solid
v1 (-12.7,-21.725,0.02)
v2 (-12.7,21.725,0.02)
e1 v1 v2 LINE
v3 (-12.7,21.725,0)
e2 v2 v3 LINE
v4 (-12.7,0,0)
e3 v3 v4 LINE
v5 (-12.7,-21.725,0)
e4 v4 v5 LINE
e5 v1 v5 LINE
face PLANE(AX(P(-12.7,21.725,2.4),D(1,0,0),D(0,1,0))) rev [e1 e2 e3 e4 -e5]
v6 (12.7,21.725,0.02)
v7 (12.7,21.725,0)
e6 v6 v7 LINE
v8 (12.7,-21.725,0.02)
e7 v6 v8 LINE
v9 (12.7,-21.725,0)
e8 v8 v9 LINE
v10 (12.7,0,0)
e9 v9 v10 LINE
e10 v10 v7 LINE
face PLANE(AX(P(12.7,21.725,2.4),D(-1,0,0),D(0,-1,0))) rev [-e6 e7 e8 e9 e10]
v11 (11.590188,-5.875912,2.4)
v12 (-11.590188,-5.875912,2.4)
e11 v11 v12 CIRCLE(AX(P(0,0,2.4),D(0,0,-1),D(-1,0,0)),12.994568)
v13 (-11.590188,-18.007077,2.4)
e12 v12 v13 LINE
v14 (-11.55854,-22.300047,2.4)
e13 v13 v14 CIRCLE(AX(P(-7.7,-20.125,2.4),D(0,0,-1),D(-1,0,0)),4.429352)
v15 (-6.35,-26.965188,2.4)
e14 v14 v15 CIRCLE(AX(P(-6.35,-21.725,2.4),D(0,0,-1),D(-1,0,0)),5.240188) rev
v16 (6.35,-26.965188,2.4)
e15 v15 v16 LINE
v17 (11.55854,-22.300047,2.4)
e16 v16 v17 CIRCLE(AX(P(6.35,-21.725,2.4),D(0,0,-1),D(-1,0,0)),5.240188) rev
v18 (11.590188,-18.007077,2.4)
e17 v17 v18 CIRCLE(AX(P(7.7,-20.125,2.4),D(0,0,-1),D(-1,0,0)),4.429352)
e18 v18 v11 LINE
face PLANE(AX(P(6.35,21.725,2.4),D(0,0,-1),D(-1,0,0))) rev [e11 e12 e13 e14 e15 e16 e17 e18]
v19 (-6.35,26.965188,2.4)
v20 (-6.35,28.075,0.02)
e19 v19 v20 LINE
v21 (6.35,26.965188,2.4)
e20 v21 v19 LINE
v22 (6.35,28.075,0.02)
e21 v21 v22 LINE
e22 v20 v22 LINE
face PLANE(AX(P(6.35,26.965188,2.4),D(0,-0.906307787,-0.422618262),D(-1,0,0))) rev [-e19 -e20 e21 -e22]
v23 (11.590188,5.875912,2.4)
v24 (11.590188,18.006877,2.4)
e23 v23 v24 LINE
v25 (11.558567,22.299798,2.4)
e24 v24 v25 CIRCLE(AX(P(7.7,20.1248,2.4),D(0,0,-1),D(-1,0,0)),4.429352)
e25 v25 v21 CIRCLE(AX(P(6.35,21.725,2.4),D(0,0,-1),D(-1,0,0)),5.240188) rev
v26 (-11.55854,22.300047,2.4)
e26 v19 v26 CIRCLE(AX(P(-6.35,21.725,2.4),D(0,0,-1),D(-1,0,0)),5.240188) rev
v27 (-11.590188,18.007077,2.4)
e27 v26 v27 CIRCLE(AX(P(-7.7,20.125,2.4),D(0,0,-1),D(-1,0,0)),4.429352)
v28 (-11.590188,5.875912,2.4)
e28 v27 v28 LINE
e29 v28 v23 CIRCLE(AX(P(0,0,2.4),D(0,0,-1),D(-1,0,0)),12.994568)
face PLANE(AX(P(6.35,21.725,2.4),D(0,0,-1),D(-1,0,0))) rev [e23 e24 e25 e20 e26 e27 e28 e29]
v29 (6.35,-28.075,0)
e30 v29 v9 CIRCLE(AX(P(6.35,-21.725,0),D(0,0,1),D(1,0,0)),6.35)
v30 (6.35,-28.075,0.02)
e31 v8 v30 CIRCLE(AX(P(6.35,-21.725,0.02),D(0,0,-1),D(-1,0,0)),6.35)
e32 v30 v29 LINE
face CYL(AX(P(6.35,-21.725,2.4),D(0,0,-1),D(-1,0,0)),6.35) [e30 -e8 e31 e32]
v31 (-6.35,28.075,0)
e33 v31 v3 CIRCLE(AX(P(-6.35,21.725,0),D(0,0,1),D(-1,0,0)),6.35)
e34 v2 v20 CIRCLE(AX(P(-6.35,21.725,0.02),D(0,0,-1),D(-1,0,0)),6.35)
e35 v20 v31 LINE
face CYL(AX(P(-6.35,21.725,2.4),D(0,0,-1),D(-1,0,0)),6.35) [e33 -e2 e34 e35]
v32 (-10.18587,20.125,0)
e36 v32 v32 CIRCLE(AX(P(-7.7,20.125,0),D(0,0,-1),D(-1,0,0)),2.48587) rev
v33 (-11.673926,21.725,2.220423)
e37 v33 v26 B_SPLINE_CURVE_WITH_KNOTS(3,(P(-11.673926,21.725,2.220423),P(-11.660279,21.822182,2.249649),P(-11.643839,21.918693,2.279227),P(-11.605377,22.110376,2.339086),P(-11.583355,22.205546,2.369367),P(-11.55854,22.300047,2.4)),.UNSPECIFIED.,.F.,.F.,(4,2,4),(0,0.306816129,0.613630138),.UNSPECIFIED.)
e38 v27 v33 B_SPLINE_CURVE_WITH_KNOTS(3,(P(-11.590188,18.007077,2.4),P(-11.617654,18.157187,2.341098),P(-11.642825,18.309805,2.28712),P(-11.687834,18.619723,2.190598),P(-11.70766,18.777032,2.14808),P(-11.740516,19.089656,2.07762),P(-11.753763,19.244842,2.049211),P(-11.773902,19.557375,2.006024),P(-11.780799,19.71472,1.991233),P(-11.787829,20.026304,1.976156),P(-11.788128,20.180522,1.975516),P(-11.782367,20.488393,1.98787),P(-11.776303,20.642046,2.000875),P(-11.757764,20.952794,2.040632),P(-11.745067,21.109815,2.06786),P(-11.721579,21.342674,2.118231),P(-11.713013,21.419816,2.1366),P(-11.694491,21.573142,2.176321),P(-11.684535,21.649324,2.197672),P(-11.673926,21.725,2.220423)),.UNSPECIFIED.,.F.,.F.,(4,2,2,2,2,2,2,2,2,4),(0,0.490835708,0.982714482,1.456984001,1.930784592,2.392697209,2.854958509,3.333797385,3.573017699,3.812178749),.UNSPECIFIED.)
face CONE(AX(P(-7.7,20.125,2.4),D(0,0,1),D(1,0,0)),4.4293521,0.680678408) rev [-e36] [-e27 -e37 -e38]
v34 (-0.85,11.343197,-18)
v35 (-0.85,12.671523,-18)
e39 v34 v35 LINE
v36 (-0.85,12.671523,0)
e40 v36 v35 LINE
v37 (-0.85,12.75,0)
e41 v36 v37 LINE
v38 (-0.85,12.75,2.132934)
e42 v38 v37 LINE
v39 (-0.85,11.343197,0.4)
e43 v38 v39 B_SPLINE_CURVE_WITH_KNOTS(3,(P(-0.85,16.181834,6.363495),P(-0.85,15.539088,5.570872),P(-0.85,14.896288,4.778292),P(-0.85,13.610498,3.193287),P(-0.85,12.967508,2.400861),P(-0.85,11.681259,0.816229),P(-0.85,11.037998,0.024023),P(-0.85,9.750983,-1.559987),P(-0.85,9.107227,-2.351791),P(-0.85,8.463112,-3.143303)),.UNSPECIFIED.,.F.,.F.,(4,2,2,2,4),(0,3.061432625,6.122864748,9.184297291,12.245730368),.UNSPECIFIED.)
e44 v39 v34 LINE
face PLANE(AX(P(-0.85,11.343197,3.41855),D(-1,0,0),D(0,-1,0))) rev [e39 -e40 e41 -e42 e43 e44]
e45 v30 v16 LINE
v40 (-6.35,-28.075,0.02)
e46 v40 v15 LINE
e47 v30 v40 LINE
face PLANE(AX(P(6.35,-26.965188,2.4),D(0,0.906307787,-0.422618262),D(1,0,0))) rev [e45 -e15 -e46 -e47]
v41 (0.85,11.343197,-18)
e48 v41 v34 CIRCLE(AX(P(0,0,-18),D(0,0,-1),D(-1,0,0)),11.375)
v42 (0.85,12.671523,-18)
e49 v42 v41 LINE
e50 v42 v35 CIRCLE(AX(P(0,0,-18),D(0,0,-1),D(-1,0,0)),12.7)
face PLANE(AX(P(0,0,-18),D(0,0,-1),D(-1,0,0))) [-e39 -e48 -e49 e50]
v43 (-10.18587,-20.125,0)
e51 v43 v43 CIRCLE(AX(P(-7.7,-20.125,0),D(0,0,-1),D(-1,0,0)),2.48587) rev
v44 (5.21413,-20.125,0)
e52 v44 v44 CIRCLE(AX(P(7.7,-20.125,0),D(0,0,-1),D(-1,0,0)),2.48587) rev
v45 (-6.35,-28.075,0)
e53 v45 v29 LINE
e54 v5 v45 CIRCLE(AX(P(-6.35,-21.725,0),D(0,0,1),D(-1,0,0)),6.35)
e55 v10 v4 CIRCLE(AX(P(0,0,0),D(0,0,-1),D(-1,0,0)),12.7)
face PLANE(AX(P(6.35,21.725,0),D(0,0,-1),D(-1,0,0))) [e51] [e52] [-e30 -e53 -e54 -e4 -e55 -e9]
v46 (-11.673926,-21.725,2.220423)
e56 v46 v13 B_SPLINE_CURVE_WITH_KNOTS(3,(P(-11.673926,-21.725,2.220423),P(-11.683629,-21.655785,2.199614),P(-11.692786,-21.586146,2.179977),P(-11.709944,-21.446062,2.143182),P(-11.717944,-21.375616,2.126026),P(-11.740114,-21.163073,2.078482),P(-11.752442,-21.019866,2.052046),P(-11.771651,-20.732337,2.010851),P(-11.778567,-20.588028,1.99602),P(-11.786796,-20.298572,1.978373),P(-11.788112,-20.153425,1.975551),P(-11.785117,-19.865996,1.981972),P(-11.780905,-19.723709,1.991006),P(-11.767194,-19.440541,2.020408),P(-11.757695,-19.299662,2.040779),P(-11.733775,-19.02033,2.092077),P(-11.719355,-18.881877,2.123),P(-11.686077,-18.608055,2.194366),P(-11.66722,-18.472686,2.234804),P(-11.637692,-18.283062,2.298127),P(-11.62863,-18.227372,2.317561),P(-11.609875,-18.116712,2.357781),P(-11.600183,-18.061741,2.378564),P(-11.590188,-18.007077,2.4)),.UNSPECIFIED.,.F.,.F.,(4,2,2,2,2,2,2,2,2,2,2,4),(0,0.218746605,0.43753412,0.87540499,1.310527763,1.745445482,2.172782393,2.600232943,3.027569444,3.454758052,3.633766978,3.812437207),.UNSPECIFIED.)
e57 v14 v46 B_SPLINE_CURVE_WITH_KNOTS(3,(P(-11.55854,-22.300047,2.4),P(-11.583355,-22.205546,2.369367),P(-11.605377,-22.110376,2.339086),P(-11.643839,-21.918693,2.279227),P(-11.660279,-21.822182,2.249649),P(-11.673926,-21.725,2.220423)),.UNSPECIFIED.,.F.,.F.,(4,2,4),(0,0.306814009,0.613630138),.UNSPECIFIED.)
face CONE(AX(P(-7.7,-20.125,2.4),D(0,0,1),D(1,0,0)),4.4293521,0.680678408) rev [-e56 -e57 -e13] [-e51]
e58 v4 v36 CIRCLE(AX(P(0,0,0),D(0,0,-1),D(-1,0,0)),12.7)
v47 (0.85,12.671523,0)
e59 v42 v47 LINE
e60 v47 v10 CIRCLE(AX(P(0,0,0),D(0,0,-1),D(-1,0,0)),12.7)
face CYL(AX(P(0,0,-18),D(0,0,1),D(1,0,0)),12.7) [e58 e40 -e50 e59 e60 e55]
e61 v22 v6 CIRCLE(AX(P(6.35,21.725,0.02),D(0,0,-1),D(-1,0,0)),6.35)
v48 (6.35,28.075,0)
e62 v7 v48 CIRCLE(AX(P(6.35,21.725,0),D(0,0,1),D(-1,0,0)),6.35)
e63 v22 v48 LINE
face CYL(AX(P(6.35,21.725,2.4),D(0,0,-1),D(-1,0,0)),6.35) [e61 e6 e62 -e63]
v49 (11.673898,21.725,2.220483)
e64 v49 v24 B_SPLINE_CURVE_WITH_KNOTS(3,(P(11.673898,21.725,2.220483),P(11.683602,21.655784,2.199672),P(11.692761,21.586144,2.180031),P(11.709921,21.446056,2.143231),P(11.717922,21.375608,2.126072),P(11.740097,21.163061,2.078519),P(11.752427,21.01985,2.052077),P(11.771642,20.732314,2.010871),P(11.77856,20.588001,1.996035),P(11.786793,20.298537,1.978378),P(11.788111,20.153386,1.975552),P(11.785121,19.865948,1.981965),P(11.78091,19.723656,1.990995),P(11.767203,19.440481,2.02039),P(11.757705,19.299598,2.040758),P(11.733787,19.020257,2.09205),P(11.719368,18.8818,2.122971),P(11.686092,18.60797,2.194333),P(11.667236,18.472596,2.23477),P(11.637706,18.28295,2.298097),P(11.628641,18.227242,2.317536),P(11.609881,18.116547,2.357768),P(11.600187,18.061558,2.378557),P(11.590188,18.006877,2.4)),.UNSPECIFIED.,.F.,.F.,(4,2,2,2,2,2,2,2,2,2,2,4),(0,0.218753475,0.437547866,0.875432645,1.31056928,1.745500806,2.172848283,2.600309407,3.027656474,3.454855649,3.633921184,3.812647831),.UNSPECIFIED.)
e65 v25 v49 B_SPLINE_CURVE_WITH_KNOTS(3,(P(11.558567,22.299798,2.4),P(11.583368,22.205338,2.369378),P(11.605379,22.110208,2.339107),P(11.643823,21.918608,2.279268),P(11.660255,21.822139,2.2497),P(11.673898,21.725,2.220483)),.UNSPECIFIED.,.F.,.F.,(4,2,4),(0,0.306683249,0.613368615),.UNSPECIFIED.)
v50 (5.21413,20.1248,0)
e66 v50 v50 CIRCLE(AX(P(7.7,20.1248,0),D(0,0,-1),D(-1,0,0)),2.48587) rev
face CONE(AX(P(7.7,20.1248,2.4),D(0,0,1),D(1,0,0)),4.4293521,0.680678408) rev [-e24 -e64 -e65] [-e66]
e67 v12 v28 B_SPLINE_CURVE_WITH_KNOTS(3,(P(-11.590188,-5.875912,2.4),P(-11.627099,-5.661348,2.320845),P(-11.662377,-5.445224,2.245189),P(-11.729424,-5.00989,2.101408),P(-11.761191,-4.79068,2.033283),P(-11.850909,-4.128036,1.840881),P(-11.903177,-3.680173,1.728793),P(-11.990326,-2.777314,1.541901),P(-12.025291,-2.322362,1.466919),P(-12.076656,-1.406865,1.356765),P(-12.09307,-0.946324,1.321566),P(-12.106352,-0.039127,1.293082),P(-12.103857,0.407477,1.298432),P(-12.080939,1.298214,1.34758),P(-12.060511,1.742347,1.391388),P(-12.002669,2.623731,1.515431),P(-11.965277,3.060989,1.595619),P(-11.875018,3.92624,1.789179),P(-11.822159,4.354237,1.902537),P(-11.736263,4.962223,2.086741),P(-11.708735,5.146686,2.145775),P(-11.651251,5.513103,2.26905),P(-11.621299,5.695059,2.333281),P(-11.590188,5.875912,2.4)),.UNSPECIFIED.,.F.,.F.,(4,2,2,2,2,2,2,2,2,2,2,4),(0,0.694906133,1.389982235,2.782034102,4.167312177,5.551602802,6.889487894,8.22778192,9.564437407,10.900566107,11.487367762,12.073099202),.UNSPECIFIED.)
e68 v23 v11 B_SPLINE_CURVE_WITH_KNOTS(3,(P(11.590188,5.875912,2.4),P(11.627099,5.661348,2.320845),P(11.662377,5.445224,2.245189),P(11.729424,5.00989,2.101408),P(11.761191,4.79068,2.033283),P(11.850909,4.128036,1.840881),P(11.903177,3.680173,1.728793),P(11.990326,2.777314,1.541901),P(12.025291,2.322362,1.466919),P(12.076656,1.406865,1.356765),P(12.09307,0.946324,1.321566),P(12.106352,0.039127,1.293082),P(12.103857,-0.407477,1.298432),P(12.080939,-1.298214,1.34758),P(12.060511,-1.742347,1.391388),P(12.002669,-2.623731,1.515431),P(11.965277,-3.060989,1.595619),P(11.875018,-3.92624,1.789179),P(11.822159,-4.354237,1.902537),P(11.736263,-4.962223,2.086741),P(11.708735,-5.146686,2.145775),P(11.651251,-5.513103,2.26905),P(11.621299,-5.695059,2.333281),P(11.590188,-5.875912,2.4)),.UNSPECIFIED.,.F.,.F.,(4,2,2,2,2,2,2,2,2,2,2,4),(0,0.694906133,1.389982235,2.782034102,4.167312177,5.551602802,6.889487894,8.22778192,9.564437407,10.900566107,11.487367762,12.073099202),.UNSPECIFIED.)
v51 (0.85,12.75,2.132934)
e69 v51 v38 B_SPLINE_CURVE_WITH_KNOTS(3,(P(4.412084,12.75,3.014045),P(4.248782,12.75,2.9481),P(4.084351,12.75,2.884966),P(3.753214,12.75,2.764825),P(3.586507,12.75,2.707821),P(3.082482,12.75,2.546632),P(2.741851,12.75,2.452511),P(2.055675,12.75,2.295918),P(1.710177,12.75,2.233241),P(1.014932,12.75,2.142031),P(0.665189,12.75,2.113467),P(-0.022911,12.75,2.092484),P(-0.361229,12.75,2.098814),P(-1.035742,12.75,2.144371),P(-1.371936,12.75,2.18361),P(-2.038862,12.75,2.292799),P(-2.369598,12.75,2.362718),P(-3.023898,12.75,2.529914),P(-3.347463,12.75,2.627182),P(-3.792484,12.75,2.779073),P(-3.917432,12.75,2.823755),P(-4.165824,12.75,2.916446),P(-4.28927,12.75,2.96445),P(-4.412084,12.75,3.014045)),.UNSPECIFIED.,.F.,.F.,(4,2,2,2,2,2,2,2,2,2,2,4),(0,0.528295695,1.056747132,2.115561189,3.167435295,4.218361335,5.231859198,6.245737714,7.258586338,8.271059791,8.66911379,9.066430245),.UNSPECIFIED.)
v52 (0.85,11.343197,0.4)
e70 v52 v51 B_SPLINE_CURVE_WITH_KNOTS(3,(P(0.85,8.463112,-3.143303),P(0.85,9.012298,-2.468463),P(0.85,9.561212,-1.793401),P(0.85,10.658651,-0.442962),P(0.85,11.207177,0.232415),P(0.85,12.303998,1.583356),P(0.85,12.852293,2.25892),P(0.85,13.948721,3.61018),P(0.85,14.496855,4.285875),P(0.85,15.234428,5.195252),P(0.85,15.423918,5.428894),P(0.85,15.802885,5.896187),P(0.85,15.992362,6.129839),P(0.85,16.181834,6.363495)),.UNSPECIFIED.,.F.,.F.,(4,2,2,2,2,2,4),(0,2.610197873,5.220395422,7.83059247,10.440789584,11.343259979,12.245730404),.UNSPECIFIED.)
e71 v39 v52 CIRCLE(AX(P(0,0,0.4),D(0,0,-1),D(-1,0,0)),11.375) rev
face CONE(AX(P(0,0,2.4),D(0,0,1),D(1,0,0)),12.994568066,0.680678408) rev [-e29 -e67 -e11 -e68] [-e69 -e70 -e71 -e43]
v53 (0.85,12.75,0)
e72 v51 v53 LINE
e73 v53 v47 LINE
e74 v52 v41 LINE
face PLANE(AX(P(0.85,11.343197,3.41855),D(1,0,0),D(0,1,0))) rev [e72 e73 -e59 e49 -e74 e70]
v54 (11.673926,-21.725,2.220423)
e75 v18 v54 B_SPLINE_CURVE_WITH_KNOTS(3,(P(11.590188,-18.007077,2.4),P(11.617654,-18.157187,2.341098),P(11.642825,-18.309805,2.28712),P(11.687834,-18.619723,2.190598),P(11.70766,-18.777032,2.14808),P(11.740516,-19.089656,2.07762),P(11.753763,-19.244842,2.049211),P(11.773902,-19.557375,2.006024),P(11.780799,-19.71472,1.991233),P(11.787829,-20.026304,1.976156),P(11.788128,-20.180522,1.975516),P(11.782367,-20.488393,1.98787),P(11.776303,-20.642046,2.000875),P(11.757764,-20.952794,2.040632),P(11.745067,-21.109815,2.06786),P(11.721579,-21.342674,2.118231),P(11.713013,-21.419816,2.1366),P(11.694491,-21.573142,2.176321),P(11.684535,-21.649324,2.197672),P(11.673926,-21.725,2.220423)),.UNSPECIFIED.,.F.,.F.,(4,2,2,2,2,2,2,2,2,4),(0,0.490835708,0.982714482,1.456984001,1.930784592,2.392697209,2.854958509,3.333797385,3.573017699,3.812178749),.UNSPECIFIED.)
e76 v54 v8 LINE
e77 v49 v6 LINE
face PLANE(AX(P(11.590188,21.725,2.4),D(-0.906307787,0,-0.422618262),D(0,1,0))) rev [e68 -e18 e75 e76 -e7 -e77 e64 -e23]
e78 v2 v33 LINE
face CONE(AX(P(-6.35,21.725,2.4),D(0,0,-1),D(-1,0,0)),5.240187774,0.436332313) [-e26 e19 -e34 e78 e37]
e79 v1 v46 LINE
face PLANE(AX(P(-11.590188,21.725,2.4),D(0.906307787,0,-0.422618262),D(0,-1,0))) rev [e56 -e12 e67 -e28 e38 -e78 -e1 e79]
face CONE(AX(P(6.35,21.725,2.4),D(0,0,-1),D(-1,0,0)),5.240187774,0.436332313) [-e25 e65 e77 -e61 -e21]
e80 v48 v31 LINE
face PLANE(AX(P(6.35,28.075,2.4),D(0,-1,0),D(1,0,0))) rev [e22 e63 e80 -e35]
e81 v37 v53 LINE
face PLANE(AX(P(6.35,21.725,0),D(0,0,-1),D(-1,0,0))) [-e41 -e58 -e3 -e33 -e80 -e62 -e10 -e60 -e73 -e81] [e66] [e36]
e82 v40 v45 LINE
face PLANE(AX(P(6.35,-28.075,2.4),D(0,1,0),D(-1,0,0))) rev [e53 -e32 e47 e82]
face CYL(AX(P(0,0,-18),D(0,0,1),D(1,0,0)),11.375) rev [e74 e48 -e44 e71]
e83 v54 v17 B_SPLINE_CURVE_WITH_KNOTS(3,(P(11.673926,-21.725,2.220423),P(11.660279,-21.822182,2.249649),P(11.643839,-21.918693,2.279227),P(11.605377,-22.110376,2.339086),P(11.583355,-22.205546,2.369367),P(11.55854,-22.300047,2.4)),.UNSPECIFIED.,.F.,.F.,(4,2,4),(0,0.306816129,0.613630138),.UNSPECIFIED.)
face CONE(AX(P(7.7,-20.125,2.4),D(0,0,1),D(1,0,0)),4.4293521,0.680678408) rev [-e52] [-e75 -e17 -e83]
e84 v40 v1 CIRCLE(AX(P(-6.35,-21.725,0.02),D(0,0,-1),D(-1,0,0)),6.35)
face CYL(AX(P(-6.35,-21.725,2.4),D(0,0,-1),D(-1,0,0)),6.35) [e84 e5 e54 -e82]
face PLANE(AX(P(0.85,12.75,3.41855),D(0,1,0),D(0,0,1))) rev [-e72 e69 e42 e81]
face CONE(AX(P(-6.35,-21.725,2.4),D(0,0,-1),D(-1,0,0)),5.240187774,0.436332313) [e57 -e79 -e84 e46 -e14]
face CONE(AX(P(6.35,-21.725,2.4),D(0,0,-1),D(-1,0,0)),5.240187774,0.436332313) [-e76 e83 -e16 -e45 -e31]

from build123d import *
from OCP.BRepFilletAPI import BRepFilletAPI_MakeChamfer

# Parameters (mm, degrees)
BOSS_EXTRUDE1_DEPTH = 2.4
SKETCH2_R           = 2
CUT_EXTRUDE1_DEPTH  = 31.907209919
CHAMFER1_SIZE       = 2.38
CHAMFER1_SIZE2      = 1.109812226
SKETCH3_R           = 12.7
SKETCH3_R_2         = 11.375
BOSS_EXTRUDE2_DEPTH = 18
CUT_EXTRUDE2_START  = -30
SKETCH4_R           = 11.375
CUT_EXTRUDE2_DEPTH  = 30
CHAMFER2_SIZE       = 2.4293521
CHAMFER2_SIZE_2     = 3
CHAMFER3_SIZE       = 1.619568066
CHAMFER3_SIZE_2     = 2
CUT_EXTRUDE3_DEPTH  = 37.954778273


with BuildPart() as part:
    # Sketch1 → Boss-Extrude1 (new body)
    with BuildSketch(Plane.XY):
        with BuildLine():
            Line((6.35, 28.075), (-6.35, 28.075))
            ThreePointArc((-6.35, 28.075), (-10.840128061, 26.215128061), (-12.7, 21.725))
            Line((-12.7, 21.725), (-12.7, -21.725))
            ThreePointArc((-12.7, -21.725), (-10.840128061, -26.215128061), (-6.35, -28.075))
            Line((-6.35, -28.075), (6.35, -28.075))
            ThreePointArc((6.35, -28.075), (10.840128061, -26.215128061), (12.7, -21.725))
            Line((12.7, -21.725), (12.7, 21.725))
            ThreePointArc((12.7, 21.725), (10.840128061, 26.215128061), (6.35, 28.075))
        make_face()
    extrude(amount=BOSS_EXTRUDE1_DEPTH)

    # Sketch2 → Cut-Extrude1 (cut, through all)
    with BuildSketch(Plane(origin=(0, 0, 0), x_dir=(-1, 0, 0), z_dir=(0, 0, -1))):
        with Locations((-7.7, 20.1248)):
            Circle(SKETCH2_R)
        with Locations((-7.7, -20.125)):
            Circle(SKETCH2_R)
        with Locations((7.7, 20.125)):
            Circle(SKETCH2_R)
        with Locations((7.7, -20.125)):
            Circle(SKETCH2_R)
    extrude(amount=-CUT_EXTRUDE1_DEPTH, mode=Mode.SUBTRACT)

    # Chamfer1: one chamfer whose edges measure the first distance from different faces: ONE call of the kernel's chamfer builder (chamfer() names one face for all edges)
    chamfer1_edges_1 = [part.edges().sort_by_distance(p)[0] for p in [
        (-10.840128061, 26.215128061, 2.4),
    ]]
    chamfer1_side_1 = [part.faces().sort_by_distance(p)[0] for p in [
        (-10.840128061, 26.215128061, 1.2),
    ]]
    chamfer1_edges_2 = [part.edges().sort_by_distance(p)[0] for p in [
        (-12.7, 0, 2.4),
    ]]
    chamfer1_side_2 = [part.faces().sort_by_distance(p)[0] for p in [
        (-12.7, 0, 1.2),
    ]]
    chamfer1_edges_3 = [part.edges().sort_by_distance(p)[0] for p in [
        (-10.840128061, -26.215128061, 2.4),
    ]]
    chamfer1_side_3 = [part.faces().sort_by_distance(p)[0] for p in [
        (-10.840128061, -26.215128061, 1.2),
    ]]
    chamfer1_edges_4 = [part.edges().sort_by_distance(p)[0] for p in [
        (0, -28.075, 2.4),
    ]]
    chamfer1_side_4 = [part.faces().sort_by_distance(p)[0] for p in [
        (0, -28.075, 1.2),
    ]]
    chamfer1_edges_5 = [part.edges().sort_by_distance(p)[0] for p in [
        (10.840128061, -26.215128061, 2.4),
    ]]
    chamfer1_side_5 = [part.faces().sort_by_distance(p)[0] for p in [
        (10.840128061, -26.215128061, 1.2),
    ]]
    chamfer1_edges_6 = [part.edges().sort_by_distance(p)[0] for p in [
        (12.7, 0, 2.4),
    ]]
    chamfer1_side_6 = [part.faces().sort_by_distance(p)[0] for p in [
        (12.7, 0, 1.2),
    ]]
    chamfer1_edges_7 = [part.edges().sort_by_distance(p)[0] for p in [
        (10.840128061, 26.215128061, 2.4),
    ]]
    chamfer1_side_7 = [part.faces().sort_by_distance(p)[0] for p in [
        (10.840128061, 26.215128061, 1.2),
    ]]
    chamfer1_edges_8 = [part.edges().sort_by_distance(p)[0] for p in [
        (0, 28.075, 2.4),
    ]]
    chamfer1_side_8 = [part.faces().sort_by_distance(p)[0] for p in [
        (0, 28.075, 1.2),
    ]]
    chamfer1 = BRepFilletAPI_MakeChamfer(part.part.solid().wrapped)
    for e in chamfer1_edges_1:
        chamfer1.Add(CHAMFER1_SIZE, CHAMFER1_SIZE2, e.wrapped, chamfer1_side_1[0].wrapped)  # the first distance lies on this face
    for e in chamfer1_edges_2:
        chamfer1.Add(CHAMFER1_SIZE, CHAMFER1_SIZE2, e.wrapped, chamfer1_side_2[0].wrapped)  # the first distance lies on this face
    for e in chamfer1_edges_3:
        chamfer1.Add(CHAMFER1_SIZE, CHAMFER1_SIZE2, e.wrapped, chamfer1_side_3[0].wrapped)  # the first distance lies on this face
    for e in chamfer1_edges_4:
        chamfer1.Add(CHAMFER1_SIZE, CHAMFER1_SIZE2, e.wrapped, chamfer1_side_4[0].wrapped)  # the first distance lies on this face
    for e in chamfer1_edges_5:
        chamfer1.Add(CHAMFER1_SIZE, CHAMFER1_SIZE2, e.wrapped, chamfer1_side_5[0].wrapped)  # the first distance lies on this face
    for e in chamfer1_edges_6:
        chamfer1.Add(CHAMFER1_SIZE, CHAMFER1_SIZE2, e.wrapped, chamfer1_side_6[0].wrapped)  # the first distance lies on this face
    for e in chamfer1_edges_7:
        chamfer1.Add(CHAMFER1_SIZE, CHAMFER1_SIZE2, e.wrapped, chamfer1_side_7[0].wrapped)  # the first distance lies on this face
    for e in chamfer1_edges_8:
        chamfer1.Add(CHAMFER1_SIZE, CHAMFER1_SIZE2, e.wrapped, chamfer1_side_8[0].wrapped)  # the first distance lies on this face
    add(Compound.cast(chamfer1.Shape()), mode=Mode.REPLACE)

    # Sketch3 → Boss-Extrude2 (add)
    with BuildSketch(Plane(origin=(0, 0, 0), x_dir=(-1, 0, 0), z_dir=(0, 0, -1))):
        Circle(SKETCH3_R)
        Circle(SKETCH3_R_2, mode=Mode.SUBTRACT)
    extrude(amount=BOSS_EXTRUDE2_DEPTH)

    # Sketch4 → Cut-Extrude2 (cut)
    with BuildSketch(Plane(origin=(0, 0, 0), x_dir=(-1, 0, 0), z_dir=(0, 0, -1)).offset(CUT_EXTRUDE2_START)):
        Circle(SKETCH4_R)
    extrude(amount=CUT_EXTRUDE2_DEPTH, mode=Mode.SUBTRACT)

    # Chamfer2
    # the kernel refuses this chamfer: 3, 2.4293521 mm, written as the material it takes off along each edge
    with BuildSketch(Plane(origin=(7.7, -20.125, 2.4), x_dir=(-1, 0, 0), z_dir=(0, -1, 0))) as chamfer2_piece_1:
        Polygon((2 + CHAMFER2_SIZE, 0), (2, CHAMFER2_SIZE_2), (2, 0), align=None)
    revolve(axis=Axis((7.7, -20.125, 2.4), (0, 0, -1)), mode=Mode.SUBTRACT)
    with BuildSketch(Plane(origin=(-7.7, -20.125, 2.4), x_dir=(-1, 0, 0), z_dir=(0, -1, 0))) as chamfer2_piece_2:
        Polygon((2 + CHAMFER2_SIZE, 0), (2, CHAMFER2_SIZE_2), (2, 0), align=None)
    revolve(axis=Axis((-7.7, -20.125, 2.4), (0, 0, -1)), mode=Mode.SUBTRACT)
    with BuildSketch(Plane(origin=(7.7, 20.1248, 2.4), x_dir=(-1, 0, 0), z_dir=(0, -1, 0))) as chamfer2_piece_3:
        Polygon((2 + CHAMFER2_SIZE, 0), (2, CHAMFER2_SIZE_2), (2, 0), align=None)
    revolve(axis=Axis((7.7, 20.1248, 2.4), (0, 0, -1)), mode=Mode.SUBTRACT)
    with BuildSketch(Plane(origin=(-7.7, 20.125, 2.4), x_dir=(-1, 0, 0), z_dir=(0, -1, 0))) as chamfer2_piece_4:
        Polygon((2 + CHAMFER2_SIZE, 0), (2, CHAMFER2_SIZE_2), (2, 0), align=None)
    revolve(axis=Axis((-7.7, 20.125, 2.4), (0, 0, -1)), mode=Mode.SUBTRACT)

    # Chamfer3
    # the kernel refuses this chamfer: 2, 1.619568066 mm, written as the material it takes off along each edge
    with BuildSketch(Plane(origin=(0, 0, 2.4), x_dir=(-1, 0, 0), z_dir=(0, 1, 0))) as chamfer3_piece_1:
        Polygon((11.375 + CHAMFER3_SIZE, 0), (11.375, -CHAMFER3_SIZE_2), (11.375, 0), align=None)
    revolve(axis=Axis((0, 0, 2.4), (0, 0, 1)), mode=Mode.SUBTRACT)

    # Sketch5 → Cut-Extrude3 (cut, through all)
    with BuildSketch(Plane(origin=(0, 0, -18), x_dir=(-1, 0, 0), z_dir=(0, 0, -1))):
        with BuildLine():
            Line((-0.85, 11.343197301), (-0.85, 12.75))
            Line((-0.85, 12.75), (0.85, 12.75))
            Line((0.85, 12.75), (0.85, 11.343197301))
            ThreePointArc((0.85, 11.343197301), (0, 11.375), (-0.85, 11.343197301))
        make_face()
    extrude(amount=-CUT_EXTRUDE3_DEPTH, mode=Mode.SUBTRACT)


solid = part.part
